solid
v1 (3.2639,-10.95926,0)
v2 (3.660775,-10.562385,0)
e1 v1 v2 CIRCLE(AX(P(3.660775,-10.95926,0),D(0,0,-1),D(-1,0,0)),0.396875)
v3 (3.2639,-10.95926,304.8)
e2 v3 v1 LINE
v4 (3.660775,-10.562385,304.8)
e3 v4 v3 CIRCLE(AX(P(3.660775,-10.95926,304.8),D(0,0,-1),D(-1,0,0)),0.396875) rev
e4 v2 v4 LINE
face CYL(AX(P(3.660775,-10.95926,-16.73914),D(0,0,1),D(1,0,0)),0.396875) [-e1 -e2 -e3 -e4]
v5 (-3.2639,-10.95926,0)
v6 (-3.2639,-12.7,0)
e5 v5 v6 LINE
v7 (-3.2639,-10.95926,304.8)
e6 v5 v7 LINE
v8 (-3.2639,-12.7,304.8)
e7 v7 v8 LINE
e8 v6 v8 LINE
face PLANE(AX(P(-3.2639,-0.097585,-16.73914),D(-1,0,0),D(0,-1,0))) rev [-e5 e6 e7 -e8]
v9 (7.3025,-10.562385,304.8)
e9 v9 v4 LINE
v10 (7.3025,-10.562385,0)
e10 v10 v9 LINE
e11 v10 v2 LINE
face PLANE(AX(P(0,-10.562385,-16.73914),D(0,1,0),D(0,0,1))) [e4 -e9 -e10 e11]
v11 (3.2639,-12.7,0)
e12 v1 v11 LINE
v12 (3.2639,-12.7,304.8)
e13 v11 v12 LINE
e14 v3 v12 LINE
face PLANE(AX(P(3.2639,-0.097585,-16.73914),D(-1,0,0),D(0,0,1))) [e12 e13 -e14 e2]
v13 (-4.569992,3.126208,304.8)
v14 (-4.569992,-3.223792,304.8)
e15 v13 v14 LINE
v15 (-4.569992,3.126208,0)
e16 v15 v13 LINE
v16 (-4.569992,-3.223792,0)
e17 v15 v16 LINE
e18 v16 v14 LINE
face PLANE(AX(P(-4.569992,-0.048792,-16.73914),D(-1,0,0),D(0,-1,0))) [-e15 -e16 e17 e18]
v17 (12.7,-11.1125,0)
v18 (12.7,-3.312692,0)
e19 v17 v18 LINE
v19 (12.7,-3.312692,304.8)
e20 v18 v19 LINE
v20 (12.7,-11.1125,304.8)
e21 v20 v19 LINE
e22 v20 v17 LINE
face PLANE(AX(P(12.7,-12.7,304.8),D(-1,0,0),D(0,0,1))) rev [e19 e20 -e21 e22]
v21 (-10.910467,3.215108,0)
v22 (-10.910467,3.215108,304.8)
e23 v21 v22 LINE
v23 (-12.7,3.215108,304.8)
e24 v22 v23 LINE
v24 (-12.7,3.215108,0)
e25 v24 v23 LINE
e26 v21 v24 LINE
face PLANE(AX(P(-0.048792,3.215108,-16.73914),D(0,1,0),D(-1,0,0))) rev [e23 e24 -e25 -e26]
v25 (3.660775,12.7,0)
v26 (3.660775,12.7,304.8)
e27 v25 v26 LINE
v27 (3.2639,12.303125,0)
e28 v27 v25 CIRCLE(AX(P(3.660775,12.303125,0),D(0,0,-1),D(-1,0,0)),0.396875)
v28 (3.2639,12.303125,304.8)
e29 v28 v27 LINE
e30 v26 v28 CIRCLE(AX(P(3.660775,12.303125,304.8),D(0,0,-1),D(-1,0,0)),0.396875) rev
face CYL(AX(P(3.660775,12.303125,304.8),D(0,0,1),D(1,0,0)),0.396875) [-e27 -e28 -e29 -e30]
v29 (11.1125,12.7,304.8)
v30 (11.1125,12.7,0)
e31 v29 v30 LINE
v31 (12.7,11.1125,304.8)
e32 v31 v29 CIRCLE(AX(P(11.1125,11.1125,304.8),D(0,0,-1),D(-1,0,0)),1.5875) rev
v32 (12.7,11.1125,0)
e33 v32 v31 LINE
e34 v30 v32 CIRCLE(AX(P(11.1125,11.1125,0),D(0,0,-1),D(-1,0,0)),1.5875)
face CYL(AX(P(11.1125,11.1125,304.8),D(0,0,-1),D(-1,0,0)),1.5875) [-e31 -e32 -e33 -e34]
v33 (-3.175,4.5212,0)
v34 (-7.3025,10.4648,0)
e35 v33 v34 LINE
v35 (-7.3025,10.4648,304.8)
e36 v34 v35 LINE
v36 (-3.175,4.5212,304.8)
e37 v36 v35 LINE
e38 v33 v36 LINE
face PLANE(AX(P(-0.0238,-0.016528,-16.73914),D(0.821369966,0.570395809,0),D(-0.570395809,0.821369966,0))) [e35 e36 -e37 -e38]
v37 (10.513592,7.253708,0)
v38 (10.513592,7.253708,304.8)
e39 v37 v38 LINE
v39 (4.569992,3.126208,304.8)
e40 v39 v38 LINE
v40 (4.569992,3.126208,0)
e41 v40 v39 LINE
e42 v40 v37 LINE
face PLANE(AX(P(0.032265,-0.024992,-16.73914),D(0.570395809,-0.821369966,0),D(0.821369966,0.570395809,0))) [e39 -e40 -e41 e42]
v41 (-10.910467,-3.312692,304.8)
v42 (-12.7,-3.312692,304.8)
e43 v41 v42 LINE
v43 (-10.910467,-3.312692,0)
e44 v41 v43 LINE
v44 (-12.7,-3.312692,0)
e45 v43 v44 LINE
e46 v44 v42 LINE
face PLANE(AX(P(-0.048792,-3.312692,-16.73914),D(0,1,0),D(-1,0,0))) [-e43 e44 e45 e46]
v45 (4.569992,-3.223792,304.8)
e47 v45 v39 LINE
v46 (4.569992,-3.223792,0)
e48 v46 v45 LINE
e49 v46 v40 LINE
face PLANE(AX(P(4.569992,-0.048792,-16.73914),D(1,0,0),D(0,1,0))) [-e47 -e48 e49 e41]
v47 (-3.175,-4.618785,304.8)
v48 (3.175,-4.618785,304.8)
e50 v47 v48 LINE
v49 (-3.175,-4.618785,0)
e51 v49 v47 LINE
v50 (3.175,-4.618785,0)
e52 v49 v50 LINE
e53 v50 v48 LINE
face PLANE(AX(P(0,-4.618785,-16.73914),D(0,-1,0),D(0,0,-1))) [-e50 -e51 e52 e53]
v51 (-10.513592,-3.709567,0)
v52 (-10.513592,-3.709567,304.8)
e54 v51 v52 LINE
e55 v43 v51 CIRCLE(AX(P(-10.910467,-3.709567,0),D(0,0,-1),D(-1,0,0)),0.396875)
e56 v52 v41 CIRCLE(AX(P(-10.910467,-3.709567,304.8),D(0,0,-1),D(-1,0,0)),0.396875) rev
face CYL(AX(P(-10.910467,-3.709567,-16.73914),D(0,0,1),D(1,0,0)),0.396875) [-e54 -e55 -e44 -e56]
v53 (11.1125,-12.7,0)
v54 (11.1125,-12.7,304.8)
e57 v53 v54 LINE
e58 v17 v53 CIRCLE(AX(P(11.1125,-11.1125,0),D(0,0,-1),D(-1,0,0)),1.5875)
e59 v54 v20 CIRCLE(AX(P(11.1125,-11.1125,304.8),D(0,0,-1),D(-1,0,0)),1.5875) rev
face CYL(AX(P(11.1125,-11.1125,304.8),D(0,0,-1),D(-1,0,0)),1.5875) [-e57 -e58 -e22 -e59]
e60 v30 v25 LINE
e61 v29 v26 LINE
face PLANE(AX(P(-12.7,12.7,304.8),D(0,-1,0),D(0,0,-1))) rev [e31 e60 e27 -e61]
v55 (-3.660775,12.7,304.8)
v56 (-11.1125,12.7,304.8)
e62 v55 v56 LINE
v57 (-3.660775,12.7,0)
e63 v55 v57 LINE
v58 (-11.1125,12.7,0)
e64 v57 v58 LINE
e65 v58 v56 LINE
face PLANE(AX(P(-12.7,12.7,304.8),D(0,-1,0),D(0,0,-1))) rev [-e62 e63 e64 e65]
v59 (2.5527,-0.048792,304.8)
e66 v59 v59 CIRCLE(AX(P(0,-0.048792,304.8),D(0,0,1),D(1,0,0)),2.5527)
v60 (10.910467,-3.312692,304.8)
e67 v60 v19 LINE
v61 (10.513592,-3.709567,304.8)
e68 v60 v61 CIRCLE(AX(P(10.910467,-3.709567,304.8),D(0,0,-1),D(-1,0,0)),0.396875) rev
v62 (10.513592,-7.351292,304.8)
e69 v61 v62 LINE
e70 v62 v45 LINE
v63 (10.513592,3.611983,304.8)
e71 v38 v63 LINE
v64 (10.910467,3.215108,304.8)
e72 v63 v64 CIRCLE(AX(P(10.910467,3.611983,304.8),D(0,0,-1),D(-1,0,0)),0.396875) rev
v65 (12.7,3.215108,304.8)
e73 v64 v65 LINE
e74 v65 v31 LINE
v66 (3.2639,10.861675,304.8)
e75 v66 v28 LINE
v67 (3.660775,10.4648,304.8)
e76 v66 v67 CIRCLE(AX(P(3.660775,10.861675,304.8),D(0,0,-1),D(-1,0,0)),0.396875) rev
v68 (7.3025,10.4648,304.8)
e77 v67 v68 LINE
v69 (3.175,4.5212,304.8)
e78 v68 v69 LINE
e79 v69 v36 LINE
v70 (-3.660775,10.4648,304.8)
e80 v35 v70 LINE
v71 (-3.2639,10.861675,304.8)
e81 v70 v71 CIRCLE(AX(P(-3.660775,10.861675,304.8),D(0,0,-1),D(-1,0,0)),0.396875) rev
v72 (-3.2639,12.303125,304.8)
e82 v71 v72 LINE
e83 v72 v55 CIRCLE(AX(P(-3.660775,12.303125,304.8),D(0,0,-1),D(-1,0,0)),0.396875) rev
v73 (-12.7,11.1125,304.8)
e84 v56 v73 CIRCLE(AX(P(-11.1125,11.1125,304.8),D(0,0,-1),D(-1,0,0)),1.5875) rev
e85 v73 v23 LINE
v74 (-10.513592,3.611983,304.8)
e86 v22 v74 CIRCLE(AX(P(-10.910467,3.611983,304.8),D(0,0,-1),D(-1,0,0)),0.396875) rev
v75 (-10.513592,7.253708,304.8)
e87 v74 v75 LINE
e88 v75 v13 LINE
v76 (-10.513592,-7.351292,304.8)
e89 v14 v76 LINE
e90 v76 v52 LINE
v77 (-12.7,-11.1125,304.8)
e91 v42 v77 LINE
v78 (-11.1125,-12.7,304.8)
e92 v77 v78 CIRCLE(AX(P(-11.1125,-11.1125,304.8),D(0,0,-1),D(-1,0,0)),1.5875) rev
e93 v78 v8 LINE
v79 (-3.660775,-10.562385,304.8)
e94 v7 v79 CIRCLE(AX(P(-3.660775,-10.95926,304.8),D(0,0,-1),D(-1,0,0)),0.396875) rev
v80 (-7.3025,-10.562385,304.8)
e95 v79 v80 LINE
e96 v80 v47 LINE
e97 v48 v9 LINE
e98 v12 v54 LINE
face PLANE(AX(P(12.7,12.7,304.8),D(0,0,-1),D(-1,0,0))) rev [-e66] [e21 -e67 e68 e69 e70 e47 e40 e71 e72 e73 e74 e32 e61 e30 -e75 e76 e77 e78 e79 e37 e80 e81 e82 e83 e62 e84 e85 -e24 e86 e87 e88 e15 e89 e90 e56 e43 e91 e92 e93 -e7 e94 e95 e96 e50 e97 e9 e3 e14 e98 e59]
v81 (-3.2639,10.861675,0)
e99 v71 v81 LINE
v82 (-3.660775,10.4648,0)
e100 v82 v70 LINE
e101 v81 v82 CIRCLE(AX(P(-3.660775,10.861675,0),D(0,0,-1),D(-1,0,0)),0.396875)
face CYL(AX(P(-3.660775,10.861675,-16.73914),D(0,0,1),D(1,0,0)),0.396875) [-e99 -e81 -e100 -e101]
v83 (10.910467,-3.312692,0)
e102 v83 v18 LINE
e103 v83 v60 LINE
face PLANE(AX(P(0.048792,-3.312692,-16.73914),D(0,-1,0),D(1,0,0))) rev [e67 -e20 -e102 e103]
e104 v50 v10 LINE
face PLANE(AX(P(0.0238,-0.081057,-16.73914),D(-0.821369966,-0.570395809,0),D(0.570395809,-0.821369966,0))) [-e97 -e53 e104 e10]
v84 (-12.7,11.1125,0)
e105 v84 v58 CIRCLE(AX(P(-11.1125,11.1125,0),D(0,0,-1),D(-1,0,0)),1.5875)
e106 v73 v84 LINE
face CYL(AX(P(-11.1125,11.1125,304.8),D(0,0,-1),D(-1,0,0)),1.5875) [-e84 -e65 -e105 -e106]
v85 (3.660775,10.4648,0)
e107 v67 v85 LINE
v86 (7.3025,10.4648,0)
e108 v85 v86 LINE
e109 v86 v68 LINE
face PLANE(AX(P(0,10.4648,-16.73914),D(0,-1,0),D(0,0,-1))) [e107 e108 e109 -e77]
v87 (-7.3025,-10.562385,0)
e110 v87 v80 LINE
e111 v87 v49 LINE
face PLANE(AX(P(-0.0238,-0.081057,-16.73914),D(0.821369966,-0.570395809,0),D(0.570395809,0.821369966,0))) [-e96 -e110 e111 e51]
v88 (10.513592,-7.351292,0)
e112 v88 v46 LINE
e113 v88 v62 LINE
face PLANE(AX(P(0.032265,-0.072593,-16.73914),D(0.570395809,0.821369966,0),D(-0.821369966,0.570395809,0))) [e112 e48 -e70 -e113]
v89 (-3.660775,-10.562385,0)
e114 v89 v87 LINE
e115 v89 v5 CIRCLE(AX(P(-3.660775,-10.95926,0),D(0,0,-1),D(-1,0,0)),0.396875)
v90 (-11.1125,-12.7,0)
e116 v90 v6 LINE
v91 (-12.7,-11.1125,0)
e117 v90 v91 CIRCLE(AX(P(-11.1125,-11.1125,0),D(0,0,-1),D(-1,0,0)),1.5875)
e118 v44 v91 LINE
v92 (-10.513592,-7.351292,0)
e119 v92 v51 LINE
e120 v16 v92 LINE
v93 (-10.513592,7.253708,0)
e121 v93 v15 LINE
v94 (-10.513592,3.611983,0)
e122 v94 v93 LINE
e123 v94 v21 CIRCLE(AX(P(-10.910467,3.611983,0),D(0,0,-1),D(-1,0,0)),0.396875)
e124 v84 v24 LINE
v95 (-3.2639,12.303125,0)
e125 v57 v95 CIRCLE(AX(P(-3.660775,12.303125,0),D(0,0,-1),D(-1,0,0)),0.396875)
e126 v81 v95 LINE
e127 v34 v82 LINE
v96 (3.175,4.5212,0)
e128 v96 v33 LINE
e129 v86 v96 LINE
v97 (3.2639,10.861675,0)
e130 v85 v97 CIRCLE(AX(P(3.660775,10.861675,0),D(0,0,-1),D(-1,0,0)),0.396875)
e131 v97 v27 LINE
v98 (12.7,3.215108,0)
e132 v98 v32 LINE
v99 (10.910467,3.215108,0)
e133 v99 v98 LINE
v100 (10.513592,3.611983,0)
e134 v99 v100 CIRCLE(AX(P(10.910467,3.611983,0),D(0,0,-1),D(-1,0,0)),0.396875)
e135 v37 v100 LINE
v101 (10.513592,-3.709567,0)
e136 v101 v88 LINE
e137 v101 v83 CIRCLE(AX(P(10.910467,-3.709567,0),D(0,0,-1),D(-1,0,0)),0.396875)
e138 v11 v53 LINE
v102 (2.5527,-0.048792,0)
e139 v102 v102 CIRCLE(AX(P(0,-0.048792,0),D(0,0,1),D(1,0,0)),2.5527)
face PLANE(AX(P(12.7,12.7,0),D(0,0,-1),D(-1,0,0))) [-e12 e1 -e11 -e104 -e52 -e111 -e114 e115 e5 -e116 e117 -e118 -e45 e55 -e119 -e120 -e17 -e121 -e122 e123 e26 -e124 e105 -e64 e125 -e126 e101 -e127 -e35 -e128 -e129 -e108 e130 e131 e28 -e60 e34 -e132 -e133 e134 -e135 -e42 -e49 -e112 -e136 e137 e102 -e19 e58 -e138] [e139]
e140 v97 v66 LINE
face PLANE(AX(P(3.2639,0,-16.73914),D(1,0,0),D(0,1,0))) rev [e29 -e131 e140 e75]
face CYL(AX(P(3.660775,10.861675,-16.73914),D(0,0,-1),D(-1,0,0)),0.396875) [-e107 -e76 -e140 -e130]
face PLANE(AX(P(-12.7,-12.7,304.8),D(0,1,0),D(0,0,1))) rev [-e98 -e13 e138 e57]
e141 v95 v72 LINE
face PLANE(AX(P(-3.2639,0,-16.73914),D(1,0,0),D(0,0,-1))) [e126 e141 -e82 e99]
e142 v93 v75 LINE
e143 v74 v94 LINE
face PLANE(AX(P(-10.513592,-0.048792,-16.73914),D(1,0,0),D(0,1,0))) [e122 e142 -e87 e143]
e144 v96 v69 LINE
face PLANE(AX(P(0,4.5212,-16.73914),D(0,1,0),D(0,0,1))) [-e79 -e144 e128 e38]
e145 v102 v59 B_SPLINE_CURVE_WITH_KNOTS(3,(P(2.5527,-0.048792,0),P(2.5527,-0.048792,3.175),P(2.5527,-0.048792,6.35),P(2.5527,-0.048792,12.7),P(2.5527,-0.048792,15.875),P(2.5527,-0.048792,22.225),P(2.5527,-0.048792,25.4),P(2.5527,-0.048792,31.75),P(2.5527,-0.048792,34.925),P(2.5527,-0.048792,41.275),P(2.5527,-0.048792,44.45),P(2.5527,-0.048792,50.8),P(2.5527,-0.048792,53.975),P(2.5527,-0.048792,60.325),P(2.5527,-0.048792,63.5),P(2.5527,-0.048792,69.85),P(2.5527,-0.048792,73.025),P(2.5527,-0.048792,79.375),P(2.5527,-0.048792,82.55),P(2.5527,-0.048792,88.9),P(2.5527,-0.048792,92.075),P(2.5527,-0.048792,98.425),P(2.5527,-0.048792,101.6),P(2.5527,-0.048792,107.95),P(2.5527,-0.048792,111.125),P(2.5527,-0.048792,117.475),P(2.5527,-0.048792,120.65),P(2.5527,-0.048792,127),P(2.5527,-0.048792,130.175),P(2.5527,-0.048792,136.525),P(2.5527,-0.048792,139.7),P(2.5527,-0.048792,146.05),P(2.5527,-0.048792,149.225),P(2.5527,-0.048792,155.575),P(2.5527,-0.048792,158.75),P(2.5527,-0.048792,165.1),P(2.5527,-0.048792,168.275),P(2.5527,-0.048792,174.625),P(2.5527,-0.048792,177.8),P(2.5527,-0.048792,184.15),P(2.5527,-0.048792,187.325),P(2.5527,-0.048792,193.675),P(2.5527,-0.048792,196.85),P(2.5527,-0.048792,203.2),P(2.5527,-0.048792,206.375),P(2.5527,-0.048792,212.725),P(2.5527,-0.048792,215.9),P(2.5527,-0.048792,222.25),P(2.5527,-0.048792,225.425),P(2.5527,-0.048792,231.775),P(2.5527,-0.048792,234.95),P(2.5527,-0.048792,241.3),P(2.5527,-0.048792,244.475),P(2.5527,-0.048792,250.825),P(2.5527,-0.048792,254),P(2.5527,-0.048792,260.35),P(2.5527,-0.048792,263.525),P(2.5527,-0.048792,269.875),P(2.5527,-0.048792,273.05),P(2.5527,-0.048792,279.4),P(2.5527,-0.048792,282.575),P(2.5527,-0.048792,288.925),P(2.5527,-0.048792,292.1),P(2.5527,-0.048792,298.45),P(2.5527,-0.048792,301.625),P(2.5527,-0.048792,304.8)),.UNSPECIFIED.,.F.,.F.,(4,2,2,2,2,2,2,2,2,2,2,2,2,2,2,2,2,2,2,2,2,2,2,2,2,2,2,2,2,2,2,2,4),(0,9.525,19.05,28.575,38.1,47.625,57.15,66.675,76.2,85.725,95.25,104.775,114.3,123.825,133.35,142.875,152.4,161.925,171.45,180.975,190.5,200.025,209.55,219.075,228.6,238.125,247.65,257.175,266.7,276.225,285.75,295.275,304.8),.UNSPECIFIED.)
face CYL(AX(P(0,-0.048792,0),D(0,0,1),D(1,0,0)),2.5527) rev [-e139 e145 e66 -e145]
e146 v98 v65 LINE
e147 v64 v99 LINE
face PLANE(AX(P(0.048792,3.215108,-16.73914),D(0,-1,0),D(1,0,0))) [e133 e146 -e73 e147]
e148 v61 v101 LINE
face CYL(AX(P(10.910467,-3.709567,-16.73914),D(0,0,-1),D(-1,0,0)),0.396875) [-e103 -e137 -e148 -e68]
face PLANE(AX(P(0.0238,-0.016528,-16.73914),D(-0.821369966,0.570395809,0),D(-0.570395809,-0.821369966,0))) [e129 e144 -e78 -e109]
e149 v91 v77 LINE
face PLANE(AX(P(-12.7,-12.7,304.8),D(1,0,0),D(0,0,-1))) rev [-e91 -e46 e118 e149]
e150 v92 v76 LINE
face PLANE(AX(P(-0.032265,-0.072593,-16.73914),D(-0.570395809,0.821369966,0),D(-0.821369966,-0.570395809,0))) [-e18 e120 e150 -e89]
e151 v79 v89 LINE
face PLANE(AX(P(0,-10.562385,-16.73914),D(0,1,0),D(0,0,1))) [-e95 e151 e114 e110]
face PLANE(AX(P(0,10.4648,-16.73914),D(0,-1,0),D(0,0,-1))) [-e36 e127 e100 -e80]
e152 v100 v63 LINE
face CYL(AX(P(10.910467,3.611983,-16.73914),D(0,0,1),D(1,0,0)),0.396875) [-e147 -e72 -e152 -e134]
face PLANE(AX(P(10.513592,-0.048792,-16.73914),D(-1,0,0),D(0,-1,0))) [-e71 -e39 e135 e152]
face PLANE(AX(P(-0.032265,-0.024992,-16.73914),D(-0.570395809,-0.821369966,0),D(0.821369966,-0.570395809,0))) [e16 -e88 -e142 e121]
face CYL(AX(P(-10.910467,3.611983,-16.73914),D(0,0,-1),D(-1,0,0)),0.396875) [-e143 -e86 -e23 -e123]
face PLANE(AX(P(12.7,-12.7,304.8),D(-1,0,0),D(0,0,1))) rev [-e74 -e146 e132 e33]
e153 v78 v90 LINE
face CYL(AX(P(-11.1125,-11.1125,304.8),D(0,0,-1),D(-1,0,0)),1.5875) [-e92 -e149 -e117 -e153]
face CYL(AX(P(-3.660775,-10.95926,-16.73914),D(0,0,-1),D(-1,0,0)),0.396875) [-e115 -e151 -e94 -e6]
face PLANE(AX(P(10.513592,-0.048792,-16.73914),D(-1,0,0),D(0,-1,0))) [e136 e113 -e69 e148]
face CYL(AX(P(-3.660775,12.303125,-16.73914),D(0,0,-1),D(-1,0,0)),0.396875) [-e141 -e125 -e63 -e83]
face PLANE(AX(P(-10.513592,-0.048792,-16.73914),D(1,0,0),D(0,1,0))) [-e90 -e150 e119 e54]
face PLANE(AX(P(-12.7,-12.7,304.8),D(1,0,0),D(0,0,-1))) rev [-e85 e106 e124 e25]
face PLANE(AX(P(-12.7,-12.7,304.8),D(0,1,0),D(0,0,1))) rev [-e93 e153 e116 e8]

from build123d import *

# Parameters (mm, degrees)
SKETCH1_W           = 25.4
SKETCH1_H           = 25.4
BOSS_EXTRUDE1_DEPTH = 304.8
FILLET1_R           = 1.5875
HOLE1_OUTLINE_R     = 2.5527
HOLE1_DEPTH         = 304.8
SKETCH7_W           = 6.5278
SKETCH7_H           = 2.2352
CUT_EXTRUDE2_DEPTH  = 304.8
FILLET4_R           = 0.396875
CIRPATTERN2_DEPTH   = 304.8


# Read off the part's stored shape, not the designer's step: Hole1, CirPattern2
with BuildPart() as part:
    # Sketch1 → Boss-Extrude1 (new body)
    with BuildSketch(Plane.XY):
        Rectangle(SKETCH1_W, SKETCH1_H)
    extrude(amount=BOSS_EXTRUDE1_DEPTH)

    # Fillet1
    fillet1_edges = [part.edges().sort_by_distance(p)[0] for p in [
        (12.7, -12.7, 152.4),
        (-12.7, -12.7, 152.4),
        (-12.7, 12.7, 152.4),
        (12.7, 12.7, 152.4),
    ]]
    fillet(fillet1_edges, radius=FILLET1_R)

    # Hole1 outline → Hole1 (cut)
    with BuildSketch(Plane.XY):
        with Locations((0, -0.048792482)):
            Circle(HOLE1_OUTLINE_R)
    extrude(amount=HOLE1_DEPTH, mode=Mode.SUBTRACT)

    # Sketch7 → Cut-Extrude2 (cut)
    with BuildSketch(Plane.XY.offset(304.8)):
        with Locations((0, 11.5824)):
            Rectangle(SKETCH7_W, SKETCH7_H)
        Polygon((-3.175, 4.5212), (-7.3025, 10.4648), (7.3025, 10.4648), (3.175, 4.5212), align=None)
    extrude(amount=-CUT_EXTRUDE2_DEPTH, mode=Mode.SUBTRACT)

    # Fillet4
    fillet4_edges = [part.edges().sort_by_distance(p)[0] for p in [
        (-3.2639, 10.4648, 152.4),
        (-3.2639, 12.7, 152.4),
        (3.2639, 12.7, 152.4),
        (3.2639, 10.4648, 152.4),
    ]]
    fillet(fillet4_edges, radius=FILLET4_R)

    # CirPattern2 outline → CirPattern2 (cut)
    with BuildSketch(Plane.XY):
        with BuildLine():
            ThreePointArc((-3.660775, -10.562384964), (-3.380141996, -10.67862696), (-3.2639, -10.959259964))
            Line((-3.2639, -10.959259964), (-3.2639, -12.7))
            Line((-3.2639, -12.7), (3.2639, -12.7))
            Line((3.2639, -12.7), (3.2639, -10.959259964))
            ThreePointArc((3.2639, -10.959259964), (3.380141996, -10.67862696), (3.660775, -10.562384964))
            Line((3.660775, -10.562384964), (7.3025, -10.562384964))
            Line((7.3025, -10.562384964), (3.175, -4.618784964))
            Line((3.175, -4.618784964), (-3.175, -4.618784964))
            Line((-3.175, -4.618784964), (-7.3025, -10.562384964))
            Line((-7.3025, -10.562384964), (-3.660775, -10.562384964))
        make_face()
        with BuildLine():
            Line((-12.7, -3.312692482), (-10.910467482, -3.312692482))
            ThreePointArc((-10.910467482, -3.312692482), (-10.629834478, -3.428934478), (-10.513592482, -3.709567482))
            Line((-10.513592482, -3.709567482), (-10.513592482, -7.351292482))
            Line((-10.513592482, -7.351292482), (-4.569992482, -3.223792482))
            Line((-4.569992482, -3.223792482), (-4.569992482, 3.126207518))
            Line((-4.569992482, 3.126207518), (-10.513592482, 7.253707518))
            Line((-10.513592482, 7.253707518), (-10.513592482, 3.611982518))
            ThreePointArc((-10.513592482, 3.611982518), (-10.629834478, 3.331349514), (-10.910467482, 3.215107518))
            Line((-10.910467482, 3.215107518), (-12.7, 3.215107518))
            Line((-12.7, 3.215107518), (-12.7, -3.312692482))
        make_face()
        with BuildLine():
            ThreePointArc((10.513592482, -3.709567482), (10.629834478, -3.428934478), (10.910467482, -3.312692482))
            Line((10.910467482, -3.312692482), (12.7, -3.312692482))
            Line((12.7, -3.312692482), (12.7, 3.215107518))
            Line((12.7, 3.215107518), (10.910467482, 3.215107518))
            ThreePointArc((10.910467482, 3.215107518), (10.629834478, 3.331349514), (10.513592482, 3.611982518))
            Line((10.513592482, 3.611982518), (10.513592482, 7.253707518))
            Line((10.513592482, 7.253707518), (4.569992482, 3.126207518))
            Line((4.569992482, 3.126207518), (4.569992482, -3.223792482))
            Line((4.569992482, -3.223792482), (10.513592482, -7.351292482))
            Line((10.513592482, -7.351292482), (10.513592482, -3.709567482))
        make_face()
    extrude(amount=CIRPATTERN2_DEPTH, mode=Mode.SUBTRACT)


solid = part.part
